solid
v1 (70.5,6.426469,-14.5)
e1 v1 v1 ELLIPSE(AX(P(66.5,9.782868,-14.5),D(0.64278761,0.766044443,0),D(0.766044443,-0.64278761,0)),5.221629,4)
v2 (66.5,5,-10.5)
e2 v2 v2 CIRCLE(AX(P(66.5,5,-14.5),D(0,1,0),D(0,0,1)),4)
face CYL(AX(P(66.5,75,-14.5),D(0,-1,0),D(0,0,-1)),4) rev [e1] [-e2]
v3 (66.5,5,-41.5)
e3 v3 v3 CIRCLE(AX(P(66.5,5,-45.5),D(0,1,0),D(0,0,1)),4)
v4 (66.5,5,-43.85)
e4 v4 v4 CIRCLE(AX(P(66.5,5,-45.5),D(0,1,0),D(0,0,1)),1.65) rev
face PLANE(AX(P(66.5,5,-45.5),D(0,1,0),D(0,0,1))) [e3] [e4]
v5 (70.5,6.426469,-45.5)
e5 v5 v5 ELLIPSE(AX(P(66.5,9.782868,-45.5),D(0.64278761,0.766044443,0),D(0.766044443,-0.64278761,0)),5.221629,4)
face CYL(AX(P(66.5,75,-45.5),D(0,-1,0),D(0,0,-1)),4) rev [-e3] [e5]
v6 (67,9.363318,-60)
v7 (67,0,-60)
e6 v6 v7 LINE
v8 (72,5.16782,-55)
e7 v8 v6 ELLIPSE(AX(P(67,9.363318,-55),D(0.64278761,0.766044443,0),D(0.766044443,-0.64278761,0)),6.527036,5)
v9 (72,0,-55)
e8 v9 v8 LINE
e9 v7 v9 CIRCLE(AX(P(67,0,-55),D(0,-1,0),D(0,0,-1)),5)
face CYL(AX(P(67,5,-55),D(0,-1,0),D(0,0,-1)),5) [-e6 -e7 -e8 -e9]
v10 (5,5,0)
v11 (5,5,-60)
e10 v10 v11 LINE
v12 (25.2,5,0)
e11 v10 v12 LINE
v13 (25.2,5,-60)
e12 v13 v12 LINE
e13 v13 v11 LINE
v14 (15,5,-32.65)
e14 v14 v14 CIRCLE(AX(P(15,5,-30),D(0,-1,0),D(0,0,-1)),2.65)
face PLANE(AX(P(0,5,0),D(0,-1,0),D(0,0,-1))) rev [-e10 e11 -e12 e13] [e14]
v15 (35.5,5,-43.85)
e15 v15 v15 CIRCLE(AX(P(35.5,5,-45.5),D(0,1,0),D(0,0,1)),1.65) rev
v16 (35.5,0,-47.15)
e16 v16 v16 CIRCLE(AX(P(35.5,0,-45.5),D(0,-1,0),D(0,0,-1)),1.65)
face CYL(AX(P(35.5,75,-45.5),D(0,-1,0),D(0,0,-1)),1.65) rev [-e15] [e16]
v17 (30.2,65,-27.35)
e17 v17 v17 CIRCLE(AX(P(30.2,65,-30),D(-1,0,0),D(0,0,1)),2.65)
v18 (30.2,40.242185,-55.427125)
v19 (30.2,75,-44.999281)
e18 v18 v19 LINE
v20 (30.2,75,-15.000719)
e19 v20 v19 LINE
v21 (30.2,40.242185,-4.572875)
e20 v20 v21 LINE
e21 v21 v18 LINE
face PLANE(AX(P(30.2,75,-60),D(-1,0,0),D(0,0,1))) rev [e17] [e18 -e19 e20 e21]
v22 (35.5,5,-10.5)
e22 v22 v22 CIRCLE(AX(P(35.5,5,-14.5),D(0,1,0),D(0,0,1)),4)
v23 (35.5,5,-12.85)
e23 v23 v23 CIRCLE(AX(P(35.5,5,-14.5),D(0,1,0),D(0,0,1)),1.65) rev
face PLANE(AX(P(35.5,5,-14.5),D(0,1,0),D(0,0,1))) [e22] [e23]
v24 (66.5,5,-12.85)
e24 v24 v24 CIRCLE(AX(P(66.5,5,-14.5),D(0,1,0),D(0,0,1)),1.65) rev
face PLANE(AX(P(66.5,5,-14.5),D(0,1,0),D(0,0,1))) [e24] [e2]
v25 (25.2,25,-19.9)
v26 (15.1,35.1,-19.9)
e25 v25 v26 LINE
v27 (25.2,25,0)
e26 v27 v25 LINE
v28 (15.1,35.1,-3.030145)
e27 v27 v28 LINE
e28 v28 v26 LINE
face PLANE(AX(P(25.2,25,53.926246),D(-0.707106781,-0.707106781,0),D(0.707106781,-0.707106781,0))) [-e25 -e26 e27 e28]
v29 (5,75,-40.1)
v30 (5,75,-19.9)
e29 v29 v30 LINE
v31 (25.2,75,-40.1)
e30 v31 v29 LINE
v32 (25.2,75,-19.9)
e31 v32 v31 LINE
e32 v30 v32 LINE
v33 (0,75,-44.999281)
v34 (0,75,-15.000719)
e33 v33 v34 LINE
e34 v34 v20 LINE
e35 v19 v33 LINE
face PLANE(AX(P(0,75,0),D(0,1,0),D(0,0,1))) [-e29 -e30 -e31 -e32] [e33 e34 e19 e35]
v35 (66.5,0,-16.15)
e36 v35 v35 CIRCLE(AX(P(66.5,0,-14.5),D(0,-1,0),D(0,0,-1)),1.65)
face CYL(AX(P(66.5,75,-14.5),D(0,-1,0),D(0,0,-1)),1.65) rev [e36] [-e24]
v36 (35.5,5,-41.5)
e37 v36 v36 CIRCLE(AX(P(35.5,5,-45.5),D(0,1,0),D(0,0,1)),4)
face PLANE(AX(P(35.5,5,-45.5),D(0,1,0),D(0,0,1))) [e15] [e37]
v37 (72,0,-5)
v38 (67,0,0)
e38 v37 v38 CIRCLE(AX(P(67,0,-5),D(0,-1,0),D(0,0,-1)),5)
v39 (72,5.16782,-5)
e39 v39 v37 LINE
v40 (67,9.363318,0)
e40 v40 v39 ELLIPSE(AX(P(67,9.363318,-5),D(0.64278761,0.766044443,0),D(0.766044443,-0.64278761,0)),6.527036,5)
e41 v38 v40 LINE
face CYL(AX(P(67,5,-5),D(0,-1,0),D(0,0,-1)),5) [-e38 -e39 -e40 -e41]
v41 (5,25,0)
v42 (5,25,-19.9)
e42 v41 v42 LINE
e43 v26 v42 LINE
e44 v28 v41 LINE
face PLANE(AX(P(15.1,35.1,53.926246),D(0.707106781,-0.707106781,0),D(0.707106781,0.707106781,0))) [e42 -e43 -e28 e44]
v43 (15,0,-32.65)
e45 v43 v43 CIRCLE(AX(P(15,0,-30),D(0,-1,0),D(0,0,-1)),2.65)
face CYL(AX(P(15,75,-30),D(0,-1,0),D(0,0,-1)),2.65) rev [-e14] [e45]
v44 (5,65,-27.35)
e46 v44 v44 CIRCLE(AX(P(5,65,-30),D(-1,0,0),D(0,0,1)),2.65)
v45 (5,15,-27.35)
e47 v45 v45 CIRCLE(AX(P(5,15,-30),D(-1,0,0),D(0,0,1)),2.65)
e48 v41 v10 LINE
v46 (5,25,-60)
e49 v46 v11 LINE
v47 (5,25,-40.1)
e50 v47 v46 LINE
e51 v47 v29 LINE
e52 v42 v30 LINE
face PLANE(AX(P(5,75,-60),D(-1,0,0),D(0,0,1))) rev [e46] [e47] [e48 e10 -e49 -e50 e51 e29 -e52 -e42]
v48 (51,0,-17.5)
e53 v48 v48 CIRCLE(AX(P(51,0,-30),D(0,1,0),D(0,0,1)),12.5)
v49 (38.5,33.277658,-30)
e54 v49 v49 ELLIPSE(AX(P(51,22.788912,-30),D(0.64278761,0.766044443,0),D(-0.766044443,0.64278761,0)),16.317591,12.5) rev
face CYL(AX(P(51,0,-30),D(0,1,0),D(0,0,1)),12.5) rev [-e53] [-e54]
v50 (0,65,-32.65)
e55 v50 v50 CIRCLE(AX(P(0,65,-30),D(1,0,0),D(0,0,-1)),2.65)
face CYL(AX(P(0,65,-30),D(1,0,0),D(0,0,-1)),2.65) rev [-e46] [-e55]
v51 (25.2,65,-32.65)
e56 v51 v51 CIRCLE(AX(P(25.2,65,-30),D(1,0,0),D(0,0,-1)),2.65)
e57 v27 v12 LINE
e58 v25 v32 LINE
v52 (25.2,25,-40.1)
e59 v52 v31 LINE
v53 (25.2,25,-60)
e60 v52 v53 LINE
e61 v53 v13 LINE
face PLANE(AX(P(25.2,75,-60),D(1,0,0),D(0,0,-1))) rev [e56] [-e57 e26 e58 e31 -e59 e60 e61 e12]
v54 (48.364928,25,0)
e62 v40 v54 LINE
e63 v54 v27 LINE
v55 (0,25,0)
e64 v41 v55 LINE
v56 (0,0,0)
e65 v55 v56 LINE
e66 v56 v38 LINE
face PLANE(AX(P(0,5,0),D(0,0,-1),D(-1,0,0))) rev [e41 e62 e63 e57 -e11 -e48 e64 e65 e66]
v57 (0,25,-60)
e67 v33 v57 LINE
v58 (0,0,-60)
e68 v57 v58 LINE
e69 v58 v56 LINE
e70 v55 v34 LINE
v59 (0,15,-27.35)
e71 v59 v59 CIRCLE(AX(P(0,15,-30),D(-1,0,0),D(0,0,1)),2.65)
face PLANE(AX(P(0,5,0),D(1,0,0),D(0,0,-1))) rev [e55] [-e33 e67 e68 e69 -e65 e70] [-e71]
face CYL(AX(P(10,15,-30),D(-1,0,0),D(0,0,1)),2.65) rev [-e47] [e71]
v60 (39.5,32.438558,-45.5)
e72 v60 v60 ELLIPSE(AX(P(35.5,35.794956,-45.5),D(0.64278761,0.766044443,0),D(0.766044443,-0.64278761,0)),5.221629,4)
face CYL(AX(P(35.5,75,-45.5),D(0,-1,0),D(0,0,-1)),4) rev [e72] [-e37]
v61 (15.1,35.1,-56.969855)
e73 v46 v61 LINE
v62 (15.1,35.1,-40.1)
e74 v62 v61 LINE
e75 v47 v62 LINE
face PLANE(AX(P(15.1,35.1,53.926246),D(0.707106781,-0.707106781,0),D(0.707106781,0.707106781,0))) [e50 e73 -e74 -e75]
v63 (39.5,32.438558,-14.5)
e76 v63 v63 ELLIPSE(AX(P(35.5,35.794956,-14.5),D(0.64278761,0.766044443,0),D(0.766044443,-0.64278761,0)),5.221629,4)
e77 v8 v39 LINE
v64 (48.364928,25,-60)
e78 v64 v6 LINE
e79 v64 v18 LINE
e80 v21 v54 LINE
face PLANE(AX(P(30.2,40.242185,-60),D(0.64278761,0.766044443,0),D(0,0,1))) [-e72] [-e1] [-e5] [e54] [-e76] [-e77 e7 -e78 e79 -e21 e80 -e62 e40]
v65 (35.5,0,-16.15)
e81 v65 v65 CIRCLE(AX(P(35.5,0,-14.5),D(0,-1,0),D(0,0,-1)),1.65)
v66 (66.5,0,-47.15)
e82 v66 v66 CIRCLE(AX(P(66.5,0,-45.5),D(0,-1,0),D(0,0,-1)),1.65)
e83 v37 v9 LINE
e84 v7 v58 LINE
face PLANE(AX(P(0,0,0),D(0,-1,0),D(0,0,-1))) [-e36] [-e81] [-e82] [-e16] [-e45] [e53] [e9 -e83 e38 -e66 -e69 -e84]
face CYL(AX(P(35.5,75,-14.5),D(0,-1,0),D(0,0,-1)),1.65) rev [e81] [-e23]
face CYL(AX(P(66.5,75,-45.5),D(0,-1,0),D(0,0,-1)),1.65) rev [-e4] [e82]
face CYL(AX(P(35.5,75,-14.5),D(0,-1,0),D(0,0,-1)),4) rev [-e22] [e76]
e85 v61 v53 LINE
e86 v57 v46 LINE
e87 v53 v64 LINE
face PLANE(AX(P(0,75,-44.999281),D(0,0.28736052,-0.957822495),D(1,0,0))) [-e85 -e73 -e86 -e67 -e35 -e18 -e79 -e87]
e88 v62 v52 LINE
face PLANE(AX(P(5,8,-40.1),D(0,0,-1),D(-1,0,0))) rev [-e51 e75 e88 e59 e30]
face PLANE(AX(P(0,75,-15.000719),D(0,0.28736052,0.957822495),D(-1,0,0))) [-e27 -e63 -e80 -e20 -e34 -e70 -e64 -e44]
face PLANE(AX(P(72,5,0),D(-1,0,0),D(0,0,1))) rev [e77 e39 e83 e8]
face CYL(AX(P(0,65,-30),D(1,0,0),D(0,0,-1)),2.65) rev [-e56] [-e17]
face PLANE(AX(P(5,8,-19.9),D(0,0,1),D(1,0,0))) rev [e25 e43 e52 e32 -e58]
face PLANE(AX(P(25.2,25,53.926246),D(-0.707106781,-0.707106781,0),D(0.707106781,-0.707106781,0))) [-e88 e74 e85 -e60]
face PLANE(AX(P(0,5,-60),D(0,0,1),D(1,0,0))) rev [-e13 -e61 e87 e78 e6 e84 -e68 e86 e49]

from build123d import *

# Parameters (mm, degrees)
SKETCH1_W               = 72
SKETCH1_H               = 60
BOSS_EXTRUDE1_DEPTH     = 5
SKETCH2_W               = 5
SKETCH2_H               = 60
BOSS_EXTRUDE2_DEPTH     = 70
SKETCH3_W               = 5
SKETCH3_H               = 60
BOSS_EXTRUDE3_DEPTH     = 70
BOSS_EXTRUDE4_DEPTH     = 60
CHAMFER1_SIZE           = 42
CHAMFER1_SIZE_2         = 35.242184509
CHAMFER2_SIZE           = 15.000718891
CHAMFER2_SIZE_2         = 50
SKETCH12_W              = 20.2
SKETCH12_H              = 20.2
CUT_EXTRUDE8_DEPTH      = 67
CUT_EXTRUDE1_DEPTH      = 117.978630527
CUT_EXTRUDE1_DEPTH_BACK = 117.978630527
SKETCH5_R               = 12.5
SKETCH6_R               = 1.65
CUT_EXTRUDE2_DEPTH      = 121.037494142
SKETCH7_R               = 4
CUT_EXTRUDE4_DEPTH      = 117.978630527
CUT_EXTRUDE5_DEPTH      = 105.748460609
CUT_EXTRUDE5_DEPTH_BACK = 105.748460609
SKETCH8_R               = 2.65
CUT_EXTRUDE6_DEPTH      = 121.037494142
CUT_EXTRUDE6_DEPTH_BACK = 121.037494142
SKETCH9_R               = 2.65
FILLET1_R               = 5
SKETCH10_R              = 2.65
CUT_EXTRUDE7_DEPTH      = 10


with BuildPart() as part:
    # Sketch1 → Boss-Extrude1 (new body)
    with BuildSketch(Plane(origin=(0, 0, 0), x_dir=(1, 0, 0), z_dir=(0, 1, 0))):
        with Locations((36, 30)):
            Rectangle(SKETCH1_W, SKETCH1_H)
    extrude(amount=BOSS_EXTRUDE1_DEPTH)

    # Sketch2 → Boss-Extrude2 (add)
    with BuildSketch(Plane(origin=(0, 5, 0), x_dir=(1, 0, 0), z_dir=(0, 1, 0))):
        with Locations((2.5, 30)):
            Rectangle(SKETCH2_W, SKETCH2_H)
    extrude(amount=BOSS_EXTRUDE2_DEPTH)

    # Sketch3 → Boss-Extrude3 (add)
    with BuildSketch(Plane(origin=(0, 5, 0), x_dir=(1, 0, 0), z_dir=(0, 1, 0))):
        with Locations((27.7, 30)):
            Rectangle(SKETCH3_W, SKETCH3_H)
    extrude(amount=BOSS_EXTRUDE3_DEPTH)

    # Sketch11 → Boss-Extrude4 (add)
    with BuildSketch(Plane(origin=(0, 0, -60), x_dir=(-1, 0, 0), z_dir=(0, 0, -1))):
        Polygon((-25.2, 25), (-15.1, 35.1), (-5, 25), (-5, 75), (-25.2, 75), align=None)
    extrude(amount=-BOSS_EXTRUDE4_DEPTH)

    # Chamfer1
    # the kernel refuses this chamfer: 42, 35.242184509 mm, written as the material it adds along each edge
    with BuildSketch(Plane(origin=(30.2, 5, -60), x_dir=(0.9996889667359942, -0.02493932209023436, 0), z_dir=(0, 0, 1))) as chamfer1_piece_1_section:
        Polygon((CHAMFER1_SIZE * 0.999688966736, CHAMFER1_SIZE * 0.0249393220902), (-CHAMFER1_SIZE_2 * 0.0249393220905, CHAMFER1_SIZE_2 * 0.999688966749), (0, 0), align=None)
    chamfer1_piece_1 = extrude(amount=60, mode=Mode.PRIVATE)
    chamfer1_piece_1 = split(chamfer1_piece_1, bisect_by=Plane(origin=(72, 16.573415306, -30), z_dir=(-1, 0, 0)), keep=Keep.TOP, mode=Mode.PRIVATE)
    add(chamfer1_piece_1)

    # Chamfer2
    # the kernel refuses this chamfer: 50, 15.000718891 mm, written as the material it takes off along each edge
    with BuildSketch(Plane(origin=(159.997065138, 75, -60), x_dir=(0, 0.12207157319780576, 0.9925213000318999), z_dir=(-1, 0, 0))) as chamfer2_piece_1:
        Polygon((CHAMFER2_SIZE * 0.99252130002, -CHAMFER2_SIZE * 0.122071573196), (-CHAMFER2_SIZE_2 * 0.122071573198, -CHAMFER2_SIZE_2 * 0.992521300032), (0, 0), align=None)
    extrude(amount=289.794130277, mode=Mode.SUBTRACT)
    with BuildSketch(Plane(origin=(159.997065138, 75, 0), x_dir=(0, 0.12207157319780576, -0.9925213000318999), z_dir=(-1, 0, 0))) as chamfer2_piece_2:
        Polygon((CHAMFER2_SIZE * 0.99252130002, CHAMFER2_SIZE * 0.122071573196), (-CHAMFER2_SIZE_2 * 0.122071573198, CHAMFER2_SIZE_2 * 0.992521300032), (0, 0), align=None)
    extrude(amount=289.794130277, mode=Mode.SUBTRACT)

    # Sketch12 → Cut-Extrude8 (cut)
    with BuildSketch(Plane(origin=(0, 75, 0), x_dir=(1, 0, 0), z_dir=(0, 1, 0))):
        with Locations((15.1, 30)):
            Rectangle(SKETCH12_W, SKETCH12_H)
    extrude(amount=-CUT_EXTRUDE8_DEPTH, mode=Mode.SUBTRACT)

    # Sketch5 → Cut-Extrude1 (cut, two sides: drawn at the far end of the back side and taken through both)
    with BuildSketch(Plane(origin=(0, 5, 0), x_dir=(1, 0, 0), z_dir=(0, 1, 0)).offset(-CUT_EXTRUDE1_DEPTH_BACK)):
        with Locations(Location((51, 30, 0), (0, 0, 270))):
            Circle(SKETCH5_R)
    extrude(amount=CUT_EXTRUDE1_DEPTH + CUT_EXTRUDE1_DEPTH_BACK, mode=Mode.SUBTRACT)

    # Sketch6 → Cut-Extrude2 (cut, through all)
    with BuildSketch(Plane.XZ):
        with Locations(Location((66.5, -14.5, 0), (0, 0, 270))):
            Circle(SKETCH6_R)
        with Locations(Location((66.5, -45.5, 0), (0, 0, 270))):
            Circle(SKETCH6_R)
        with Locations(Location((35.5, -45.5, 0), (0, 0, 270))):
            Circle(SKETCH6_R)
        with Locations(Location((35.5, -14.5, 0), (0, 0, 270))):
            Circle(SKETCH6_R)
    extrude(amount=-CUT_EXTRUDE2_DEPTH, mode=Mode.SUBTRACT)

    # Sketch7 → Cut-Extrude4 (cut, through all)
    with BuildSketch(Plane(origin=(0, 5, 0), x_dir=(1, 0, 0), z_dir=(0, 1, 0))):
        with Locations((66.5, 45.5)):
            Circle(SKETCH7_R)
        with Locations((66.5, 14.5)):
            Circle(SKETCH7_R)
        with Locations((35.5, 14.5)):
            Circle(SKETCH7_R)
        with Locations((35.5, 45.5)):
            Circle(SKETCH7_R)
    extrude(amount=CUT_EXTRUDE4_DEPTH, mode=Mode.SUBTRACT)

    # Sketch8 → Cut-Extrude5 (cut, two sides: drawn at the far end of the back side and taken through both)
    with BuildSketch(Plane(origin=(30.2, 0, 0), x_dir=(0, 0, -1), z_dir=(1, 0, 0)).offset(-CUT_EXTRUDE5_DEPTH_BACK)):
        with Locations((30, 65)):
            Circle(SKETCH8_R)
    extrude(amount=CUT_EXTRUDE5_DEPTH + CUT_EXTRUDE5_DEPTH_BACK, mode=Mode.SUBTRACT)

    # Sketch9 → Cut-Extrude6 (cut, two sides: drawn at the far end of the back side and taken through both)
    with BuildSketch(Plane.XZ.offset(-CUT_EXTRUDE6_DEPTH_BACK)):
        with Locations(Location((15, -30, 0), (0, 0, 270))):
            Circle(SKETCH9_R)
    extrude(amount=CUT_EXTRUDE6_DEPTH + CUT_EXTRUDE6_DEPTH_BACK, mode=Mode.SUBTRACT)

    # Fillet1
    fillet1_edges = [part.edges().sort_by_distance(p)[0] for p in [
        (72, 2.583909963, -60),
        (72, 2.583909963, 0),
    ]]
    fillet(fillet1_edges, radius=FILLET1_R)

    # Sketch10 → Cut-Extrude7 (cut)
    with BuildSketch(Plane.ZY):
        with Locations((-30, 15)):
            Circle(SKETCH10_R)
    extrude(amount=-CUT_EXTRUDE7_DEPTH, mode=Mode.SUBTRACT)


solid = part.part
